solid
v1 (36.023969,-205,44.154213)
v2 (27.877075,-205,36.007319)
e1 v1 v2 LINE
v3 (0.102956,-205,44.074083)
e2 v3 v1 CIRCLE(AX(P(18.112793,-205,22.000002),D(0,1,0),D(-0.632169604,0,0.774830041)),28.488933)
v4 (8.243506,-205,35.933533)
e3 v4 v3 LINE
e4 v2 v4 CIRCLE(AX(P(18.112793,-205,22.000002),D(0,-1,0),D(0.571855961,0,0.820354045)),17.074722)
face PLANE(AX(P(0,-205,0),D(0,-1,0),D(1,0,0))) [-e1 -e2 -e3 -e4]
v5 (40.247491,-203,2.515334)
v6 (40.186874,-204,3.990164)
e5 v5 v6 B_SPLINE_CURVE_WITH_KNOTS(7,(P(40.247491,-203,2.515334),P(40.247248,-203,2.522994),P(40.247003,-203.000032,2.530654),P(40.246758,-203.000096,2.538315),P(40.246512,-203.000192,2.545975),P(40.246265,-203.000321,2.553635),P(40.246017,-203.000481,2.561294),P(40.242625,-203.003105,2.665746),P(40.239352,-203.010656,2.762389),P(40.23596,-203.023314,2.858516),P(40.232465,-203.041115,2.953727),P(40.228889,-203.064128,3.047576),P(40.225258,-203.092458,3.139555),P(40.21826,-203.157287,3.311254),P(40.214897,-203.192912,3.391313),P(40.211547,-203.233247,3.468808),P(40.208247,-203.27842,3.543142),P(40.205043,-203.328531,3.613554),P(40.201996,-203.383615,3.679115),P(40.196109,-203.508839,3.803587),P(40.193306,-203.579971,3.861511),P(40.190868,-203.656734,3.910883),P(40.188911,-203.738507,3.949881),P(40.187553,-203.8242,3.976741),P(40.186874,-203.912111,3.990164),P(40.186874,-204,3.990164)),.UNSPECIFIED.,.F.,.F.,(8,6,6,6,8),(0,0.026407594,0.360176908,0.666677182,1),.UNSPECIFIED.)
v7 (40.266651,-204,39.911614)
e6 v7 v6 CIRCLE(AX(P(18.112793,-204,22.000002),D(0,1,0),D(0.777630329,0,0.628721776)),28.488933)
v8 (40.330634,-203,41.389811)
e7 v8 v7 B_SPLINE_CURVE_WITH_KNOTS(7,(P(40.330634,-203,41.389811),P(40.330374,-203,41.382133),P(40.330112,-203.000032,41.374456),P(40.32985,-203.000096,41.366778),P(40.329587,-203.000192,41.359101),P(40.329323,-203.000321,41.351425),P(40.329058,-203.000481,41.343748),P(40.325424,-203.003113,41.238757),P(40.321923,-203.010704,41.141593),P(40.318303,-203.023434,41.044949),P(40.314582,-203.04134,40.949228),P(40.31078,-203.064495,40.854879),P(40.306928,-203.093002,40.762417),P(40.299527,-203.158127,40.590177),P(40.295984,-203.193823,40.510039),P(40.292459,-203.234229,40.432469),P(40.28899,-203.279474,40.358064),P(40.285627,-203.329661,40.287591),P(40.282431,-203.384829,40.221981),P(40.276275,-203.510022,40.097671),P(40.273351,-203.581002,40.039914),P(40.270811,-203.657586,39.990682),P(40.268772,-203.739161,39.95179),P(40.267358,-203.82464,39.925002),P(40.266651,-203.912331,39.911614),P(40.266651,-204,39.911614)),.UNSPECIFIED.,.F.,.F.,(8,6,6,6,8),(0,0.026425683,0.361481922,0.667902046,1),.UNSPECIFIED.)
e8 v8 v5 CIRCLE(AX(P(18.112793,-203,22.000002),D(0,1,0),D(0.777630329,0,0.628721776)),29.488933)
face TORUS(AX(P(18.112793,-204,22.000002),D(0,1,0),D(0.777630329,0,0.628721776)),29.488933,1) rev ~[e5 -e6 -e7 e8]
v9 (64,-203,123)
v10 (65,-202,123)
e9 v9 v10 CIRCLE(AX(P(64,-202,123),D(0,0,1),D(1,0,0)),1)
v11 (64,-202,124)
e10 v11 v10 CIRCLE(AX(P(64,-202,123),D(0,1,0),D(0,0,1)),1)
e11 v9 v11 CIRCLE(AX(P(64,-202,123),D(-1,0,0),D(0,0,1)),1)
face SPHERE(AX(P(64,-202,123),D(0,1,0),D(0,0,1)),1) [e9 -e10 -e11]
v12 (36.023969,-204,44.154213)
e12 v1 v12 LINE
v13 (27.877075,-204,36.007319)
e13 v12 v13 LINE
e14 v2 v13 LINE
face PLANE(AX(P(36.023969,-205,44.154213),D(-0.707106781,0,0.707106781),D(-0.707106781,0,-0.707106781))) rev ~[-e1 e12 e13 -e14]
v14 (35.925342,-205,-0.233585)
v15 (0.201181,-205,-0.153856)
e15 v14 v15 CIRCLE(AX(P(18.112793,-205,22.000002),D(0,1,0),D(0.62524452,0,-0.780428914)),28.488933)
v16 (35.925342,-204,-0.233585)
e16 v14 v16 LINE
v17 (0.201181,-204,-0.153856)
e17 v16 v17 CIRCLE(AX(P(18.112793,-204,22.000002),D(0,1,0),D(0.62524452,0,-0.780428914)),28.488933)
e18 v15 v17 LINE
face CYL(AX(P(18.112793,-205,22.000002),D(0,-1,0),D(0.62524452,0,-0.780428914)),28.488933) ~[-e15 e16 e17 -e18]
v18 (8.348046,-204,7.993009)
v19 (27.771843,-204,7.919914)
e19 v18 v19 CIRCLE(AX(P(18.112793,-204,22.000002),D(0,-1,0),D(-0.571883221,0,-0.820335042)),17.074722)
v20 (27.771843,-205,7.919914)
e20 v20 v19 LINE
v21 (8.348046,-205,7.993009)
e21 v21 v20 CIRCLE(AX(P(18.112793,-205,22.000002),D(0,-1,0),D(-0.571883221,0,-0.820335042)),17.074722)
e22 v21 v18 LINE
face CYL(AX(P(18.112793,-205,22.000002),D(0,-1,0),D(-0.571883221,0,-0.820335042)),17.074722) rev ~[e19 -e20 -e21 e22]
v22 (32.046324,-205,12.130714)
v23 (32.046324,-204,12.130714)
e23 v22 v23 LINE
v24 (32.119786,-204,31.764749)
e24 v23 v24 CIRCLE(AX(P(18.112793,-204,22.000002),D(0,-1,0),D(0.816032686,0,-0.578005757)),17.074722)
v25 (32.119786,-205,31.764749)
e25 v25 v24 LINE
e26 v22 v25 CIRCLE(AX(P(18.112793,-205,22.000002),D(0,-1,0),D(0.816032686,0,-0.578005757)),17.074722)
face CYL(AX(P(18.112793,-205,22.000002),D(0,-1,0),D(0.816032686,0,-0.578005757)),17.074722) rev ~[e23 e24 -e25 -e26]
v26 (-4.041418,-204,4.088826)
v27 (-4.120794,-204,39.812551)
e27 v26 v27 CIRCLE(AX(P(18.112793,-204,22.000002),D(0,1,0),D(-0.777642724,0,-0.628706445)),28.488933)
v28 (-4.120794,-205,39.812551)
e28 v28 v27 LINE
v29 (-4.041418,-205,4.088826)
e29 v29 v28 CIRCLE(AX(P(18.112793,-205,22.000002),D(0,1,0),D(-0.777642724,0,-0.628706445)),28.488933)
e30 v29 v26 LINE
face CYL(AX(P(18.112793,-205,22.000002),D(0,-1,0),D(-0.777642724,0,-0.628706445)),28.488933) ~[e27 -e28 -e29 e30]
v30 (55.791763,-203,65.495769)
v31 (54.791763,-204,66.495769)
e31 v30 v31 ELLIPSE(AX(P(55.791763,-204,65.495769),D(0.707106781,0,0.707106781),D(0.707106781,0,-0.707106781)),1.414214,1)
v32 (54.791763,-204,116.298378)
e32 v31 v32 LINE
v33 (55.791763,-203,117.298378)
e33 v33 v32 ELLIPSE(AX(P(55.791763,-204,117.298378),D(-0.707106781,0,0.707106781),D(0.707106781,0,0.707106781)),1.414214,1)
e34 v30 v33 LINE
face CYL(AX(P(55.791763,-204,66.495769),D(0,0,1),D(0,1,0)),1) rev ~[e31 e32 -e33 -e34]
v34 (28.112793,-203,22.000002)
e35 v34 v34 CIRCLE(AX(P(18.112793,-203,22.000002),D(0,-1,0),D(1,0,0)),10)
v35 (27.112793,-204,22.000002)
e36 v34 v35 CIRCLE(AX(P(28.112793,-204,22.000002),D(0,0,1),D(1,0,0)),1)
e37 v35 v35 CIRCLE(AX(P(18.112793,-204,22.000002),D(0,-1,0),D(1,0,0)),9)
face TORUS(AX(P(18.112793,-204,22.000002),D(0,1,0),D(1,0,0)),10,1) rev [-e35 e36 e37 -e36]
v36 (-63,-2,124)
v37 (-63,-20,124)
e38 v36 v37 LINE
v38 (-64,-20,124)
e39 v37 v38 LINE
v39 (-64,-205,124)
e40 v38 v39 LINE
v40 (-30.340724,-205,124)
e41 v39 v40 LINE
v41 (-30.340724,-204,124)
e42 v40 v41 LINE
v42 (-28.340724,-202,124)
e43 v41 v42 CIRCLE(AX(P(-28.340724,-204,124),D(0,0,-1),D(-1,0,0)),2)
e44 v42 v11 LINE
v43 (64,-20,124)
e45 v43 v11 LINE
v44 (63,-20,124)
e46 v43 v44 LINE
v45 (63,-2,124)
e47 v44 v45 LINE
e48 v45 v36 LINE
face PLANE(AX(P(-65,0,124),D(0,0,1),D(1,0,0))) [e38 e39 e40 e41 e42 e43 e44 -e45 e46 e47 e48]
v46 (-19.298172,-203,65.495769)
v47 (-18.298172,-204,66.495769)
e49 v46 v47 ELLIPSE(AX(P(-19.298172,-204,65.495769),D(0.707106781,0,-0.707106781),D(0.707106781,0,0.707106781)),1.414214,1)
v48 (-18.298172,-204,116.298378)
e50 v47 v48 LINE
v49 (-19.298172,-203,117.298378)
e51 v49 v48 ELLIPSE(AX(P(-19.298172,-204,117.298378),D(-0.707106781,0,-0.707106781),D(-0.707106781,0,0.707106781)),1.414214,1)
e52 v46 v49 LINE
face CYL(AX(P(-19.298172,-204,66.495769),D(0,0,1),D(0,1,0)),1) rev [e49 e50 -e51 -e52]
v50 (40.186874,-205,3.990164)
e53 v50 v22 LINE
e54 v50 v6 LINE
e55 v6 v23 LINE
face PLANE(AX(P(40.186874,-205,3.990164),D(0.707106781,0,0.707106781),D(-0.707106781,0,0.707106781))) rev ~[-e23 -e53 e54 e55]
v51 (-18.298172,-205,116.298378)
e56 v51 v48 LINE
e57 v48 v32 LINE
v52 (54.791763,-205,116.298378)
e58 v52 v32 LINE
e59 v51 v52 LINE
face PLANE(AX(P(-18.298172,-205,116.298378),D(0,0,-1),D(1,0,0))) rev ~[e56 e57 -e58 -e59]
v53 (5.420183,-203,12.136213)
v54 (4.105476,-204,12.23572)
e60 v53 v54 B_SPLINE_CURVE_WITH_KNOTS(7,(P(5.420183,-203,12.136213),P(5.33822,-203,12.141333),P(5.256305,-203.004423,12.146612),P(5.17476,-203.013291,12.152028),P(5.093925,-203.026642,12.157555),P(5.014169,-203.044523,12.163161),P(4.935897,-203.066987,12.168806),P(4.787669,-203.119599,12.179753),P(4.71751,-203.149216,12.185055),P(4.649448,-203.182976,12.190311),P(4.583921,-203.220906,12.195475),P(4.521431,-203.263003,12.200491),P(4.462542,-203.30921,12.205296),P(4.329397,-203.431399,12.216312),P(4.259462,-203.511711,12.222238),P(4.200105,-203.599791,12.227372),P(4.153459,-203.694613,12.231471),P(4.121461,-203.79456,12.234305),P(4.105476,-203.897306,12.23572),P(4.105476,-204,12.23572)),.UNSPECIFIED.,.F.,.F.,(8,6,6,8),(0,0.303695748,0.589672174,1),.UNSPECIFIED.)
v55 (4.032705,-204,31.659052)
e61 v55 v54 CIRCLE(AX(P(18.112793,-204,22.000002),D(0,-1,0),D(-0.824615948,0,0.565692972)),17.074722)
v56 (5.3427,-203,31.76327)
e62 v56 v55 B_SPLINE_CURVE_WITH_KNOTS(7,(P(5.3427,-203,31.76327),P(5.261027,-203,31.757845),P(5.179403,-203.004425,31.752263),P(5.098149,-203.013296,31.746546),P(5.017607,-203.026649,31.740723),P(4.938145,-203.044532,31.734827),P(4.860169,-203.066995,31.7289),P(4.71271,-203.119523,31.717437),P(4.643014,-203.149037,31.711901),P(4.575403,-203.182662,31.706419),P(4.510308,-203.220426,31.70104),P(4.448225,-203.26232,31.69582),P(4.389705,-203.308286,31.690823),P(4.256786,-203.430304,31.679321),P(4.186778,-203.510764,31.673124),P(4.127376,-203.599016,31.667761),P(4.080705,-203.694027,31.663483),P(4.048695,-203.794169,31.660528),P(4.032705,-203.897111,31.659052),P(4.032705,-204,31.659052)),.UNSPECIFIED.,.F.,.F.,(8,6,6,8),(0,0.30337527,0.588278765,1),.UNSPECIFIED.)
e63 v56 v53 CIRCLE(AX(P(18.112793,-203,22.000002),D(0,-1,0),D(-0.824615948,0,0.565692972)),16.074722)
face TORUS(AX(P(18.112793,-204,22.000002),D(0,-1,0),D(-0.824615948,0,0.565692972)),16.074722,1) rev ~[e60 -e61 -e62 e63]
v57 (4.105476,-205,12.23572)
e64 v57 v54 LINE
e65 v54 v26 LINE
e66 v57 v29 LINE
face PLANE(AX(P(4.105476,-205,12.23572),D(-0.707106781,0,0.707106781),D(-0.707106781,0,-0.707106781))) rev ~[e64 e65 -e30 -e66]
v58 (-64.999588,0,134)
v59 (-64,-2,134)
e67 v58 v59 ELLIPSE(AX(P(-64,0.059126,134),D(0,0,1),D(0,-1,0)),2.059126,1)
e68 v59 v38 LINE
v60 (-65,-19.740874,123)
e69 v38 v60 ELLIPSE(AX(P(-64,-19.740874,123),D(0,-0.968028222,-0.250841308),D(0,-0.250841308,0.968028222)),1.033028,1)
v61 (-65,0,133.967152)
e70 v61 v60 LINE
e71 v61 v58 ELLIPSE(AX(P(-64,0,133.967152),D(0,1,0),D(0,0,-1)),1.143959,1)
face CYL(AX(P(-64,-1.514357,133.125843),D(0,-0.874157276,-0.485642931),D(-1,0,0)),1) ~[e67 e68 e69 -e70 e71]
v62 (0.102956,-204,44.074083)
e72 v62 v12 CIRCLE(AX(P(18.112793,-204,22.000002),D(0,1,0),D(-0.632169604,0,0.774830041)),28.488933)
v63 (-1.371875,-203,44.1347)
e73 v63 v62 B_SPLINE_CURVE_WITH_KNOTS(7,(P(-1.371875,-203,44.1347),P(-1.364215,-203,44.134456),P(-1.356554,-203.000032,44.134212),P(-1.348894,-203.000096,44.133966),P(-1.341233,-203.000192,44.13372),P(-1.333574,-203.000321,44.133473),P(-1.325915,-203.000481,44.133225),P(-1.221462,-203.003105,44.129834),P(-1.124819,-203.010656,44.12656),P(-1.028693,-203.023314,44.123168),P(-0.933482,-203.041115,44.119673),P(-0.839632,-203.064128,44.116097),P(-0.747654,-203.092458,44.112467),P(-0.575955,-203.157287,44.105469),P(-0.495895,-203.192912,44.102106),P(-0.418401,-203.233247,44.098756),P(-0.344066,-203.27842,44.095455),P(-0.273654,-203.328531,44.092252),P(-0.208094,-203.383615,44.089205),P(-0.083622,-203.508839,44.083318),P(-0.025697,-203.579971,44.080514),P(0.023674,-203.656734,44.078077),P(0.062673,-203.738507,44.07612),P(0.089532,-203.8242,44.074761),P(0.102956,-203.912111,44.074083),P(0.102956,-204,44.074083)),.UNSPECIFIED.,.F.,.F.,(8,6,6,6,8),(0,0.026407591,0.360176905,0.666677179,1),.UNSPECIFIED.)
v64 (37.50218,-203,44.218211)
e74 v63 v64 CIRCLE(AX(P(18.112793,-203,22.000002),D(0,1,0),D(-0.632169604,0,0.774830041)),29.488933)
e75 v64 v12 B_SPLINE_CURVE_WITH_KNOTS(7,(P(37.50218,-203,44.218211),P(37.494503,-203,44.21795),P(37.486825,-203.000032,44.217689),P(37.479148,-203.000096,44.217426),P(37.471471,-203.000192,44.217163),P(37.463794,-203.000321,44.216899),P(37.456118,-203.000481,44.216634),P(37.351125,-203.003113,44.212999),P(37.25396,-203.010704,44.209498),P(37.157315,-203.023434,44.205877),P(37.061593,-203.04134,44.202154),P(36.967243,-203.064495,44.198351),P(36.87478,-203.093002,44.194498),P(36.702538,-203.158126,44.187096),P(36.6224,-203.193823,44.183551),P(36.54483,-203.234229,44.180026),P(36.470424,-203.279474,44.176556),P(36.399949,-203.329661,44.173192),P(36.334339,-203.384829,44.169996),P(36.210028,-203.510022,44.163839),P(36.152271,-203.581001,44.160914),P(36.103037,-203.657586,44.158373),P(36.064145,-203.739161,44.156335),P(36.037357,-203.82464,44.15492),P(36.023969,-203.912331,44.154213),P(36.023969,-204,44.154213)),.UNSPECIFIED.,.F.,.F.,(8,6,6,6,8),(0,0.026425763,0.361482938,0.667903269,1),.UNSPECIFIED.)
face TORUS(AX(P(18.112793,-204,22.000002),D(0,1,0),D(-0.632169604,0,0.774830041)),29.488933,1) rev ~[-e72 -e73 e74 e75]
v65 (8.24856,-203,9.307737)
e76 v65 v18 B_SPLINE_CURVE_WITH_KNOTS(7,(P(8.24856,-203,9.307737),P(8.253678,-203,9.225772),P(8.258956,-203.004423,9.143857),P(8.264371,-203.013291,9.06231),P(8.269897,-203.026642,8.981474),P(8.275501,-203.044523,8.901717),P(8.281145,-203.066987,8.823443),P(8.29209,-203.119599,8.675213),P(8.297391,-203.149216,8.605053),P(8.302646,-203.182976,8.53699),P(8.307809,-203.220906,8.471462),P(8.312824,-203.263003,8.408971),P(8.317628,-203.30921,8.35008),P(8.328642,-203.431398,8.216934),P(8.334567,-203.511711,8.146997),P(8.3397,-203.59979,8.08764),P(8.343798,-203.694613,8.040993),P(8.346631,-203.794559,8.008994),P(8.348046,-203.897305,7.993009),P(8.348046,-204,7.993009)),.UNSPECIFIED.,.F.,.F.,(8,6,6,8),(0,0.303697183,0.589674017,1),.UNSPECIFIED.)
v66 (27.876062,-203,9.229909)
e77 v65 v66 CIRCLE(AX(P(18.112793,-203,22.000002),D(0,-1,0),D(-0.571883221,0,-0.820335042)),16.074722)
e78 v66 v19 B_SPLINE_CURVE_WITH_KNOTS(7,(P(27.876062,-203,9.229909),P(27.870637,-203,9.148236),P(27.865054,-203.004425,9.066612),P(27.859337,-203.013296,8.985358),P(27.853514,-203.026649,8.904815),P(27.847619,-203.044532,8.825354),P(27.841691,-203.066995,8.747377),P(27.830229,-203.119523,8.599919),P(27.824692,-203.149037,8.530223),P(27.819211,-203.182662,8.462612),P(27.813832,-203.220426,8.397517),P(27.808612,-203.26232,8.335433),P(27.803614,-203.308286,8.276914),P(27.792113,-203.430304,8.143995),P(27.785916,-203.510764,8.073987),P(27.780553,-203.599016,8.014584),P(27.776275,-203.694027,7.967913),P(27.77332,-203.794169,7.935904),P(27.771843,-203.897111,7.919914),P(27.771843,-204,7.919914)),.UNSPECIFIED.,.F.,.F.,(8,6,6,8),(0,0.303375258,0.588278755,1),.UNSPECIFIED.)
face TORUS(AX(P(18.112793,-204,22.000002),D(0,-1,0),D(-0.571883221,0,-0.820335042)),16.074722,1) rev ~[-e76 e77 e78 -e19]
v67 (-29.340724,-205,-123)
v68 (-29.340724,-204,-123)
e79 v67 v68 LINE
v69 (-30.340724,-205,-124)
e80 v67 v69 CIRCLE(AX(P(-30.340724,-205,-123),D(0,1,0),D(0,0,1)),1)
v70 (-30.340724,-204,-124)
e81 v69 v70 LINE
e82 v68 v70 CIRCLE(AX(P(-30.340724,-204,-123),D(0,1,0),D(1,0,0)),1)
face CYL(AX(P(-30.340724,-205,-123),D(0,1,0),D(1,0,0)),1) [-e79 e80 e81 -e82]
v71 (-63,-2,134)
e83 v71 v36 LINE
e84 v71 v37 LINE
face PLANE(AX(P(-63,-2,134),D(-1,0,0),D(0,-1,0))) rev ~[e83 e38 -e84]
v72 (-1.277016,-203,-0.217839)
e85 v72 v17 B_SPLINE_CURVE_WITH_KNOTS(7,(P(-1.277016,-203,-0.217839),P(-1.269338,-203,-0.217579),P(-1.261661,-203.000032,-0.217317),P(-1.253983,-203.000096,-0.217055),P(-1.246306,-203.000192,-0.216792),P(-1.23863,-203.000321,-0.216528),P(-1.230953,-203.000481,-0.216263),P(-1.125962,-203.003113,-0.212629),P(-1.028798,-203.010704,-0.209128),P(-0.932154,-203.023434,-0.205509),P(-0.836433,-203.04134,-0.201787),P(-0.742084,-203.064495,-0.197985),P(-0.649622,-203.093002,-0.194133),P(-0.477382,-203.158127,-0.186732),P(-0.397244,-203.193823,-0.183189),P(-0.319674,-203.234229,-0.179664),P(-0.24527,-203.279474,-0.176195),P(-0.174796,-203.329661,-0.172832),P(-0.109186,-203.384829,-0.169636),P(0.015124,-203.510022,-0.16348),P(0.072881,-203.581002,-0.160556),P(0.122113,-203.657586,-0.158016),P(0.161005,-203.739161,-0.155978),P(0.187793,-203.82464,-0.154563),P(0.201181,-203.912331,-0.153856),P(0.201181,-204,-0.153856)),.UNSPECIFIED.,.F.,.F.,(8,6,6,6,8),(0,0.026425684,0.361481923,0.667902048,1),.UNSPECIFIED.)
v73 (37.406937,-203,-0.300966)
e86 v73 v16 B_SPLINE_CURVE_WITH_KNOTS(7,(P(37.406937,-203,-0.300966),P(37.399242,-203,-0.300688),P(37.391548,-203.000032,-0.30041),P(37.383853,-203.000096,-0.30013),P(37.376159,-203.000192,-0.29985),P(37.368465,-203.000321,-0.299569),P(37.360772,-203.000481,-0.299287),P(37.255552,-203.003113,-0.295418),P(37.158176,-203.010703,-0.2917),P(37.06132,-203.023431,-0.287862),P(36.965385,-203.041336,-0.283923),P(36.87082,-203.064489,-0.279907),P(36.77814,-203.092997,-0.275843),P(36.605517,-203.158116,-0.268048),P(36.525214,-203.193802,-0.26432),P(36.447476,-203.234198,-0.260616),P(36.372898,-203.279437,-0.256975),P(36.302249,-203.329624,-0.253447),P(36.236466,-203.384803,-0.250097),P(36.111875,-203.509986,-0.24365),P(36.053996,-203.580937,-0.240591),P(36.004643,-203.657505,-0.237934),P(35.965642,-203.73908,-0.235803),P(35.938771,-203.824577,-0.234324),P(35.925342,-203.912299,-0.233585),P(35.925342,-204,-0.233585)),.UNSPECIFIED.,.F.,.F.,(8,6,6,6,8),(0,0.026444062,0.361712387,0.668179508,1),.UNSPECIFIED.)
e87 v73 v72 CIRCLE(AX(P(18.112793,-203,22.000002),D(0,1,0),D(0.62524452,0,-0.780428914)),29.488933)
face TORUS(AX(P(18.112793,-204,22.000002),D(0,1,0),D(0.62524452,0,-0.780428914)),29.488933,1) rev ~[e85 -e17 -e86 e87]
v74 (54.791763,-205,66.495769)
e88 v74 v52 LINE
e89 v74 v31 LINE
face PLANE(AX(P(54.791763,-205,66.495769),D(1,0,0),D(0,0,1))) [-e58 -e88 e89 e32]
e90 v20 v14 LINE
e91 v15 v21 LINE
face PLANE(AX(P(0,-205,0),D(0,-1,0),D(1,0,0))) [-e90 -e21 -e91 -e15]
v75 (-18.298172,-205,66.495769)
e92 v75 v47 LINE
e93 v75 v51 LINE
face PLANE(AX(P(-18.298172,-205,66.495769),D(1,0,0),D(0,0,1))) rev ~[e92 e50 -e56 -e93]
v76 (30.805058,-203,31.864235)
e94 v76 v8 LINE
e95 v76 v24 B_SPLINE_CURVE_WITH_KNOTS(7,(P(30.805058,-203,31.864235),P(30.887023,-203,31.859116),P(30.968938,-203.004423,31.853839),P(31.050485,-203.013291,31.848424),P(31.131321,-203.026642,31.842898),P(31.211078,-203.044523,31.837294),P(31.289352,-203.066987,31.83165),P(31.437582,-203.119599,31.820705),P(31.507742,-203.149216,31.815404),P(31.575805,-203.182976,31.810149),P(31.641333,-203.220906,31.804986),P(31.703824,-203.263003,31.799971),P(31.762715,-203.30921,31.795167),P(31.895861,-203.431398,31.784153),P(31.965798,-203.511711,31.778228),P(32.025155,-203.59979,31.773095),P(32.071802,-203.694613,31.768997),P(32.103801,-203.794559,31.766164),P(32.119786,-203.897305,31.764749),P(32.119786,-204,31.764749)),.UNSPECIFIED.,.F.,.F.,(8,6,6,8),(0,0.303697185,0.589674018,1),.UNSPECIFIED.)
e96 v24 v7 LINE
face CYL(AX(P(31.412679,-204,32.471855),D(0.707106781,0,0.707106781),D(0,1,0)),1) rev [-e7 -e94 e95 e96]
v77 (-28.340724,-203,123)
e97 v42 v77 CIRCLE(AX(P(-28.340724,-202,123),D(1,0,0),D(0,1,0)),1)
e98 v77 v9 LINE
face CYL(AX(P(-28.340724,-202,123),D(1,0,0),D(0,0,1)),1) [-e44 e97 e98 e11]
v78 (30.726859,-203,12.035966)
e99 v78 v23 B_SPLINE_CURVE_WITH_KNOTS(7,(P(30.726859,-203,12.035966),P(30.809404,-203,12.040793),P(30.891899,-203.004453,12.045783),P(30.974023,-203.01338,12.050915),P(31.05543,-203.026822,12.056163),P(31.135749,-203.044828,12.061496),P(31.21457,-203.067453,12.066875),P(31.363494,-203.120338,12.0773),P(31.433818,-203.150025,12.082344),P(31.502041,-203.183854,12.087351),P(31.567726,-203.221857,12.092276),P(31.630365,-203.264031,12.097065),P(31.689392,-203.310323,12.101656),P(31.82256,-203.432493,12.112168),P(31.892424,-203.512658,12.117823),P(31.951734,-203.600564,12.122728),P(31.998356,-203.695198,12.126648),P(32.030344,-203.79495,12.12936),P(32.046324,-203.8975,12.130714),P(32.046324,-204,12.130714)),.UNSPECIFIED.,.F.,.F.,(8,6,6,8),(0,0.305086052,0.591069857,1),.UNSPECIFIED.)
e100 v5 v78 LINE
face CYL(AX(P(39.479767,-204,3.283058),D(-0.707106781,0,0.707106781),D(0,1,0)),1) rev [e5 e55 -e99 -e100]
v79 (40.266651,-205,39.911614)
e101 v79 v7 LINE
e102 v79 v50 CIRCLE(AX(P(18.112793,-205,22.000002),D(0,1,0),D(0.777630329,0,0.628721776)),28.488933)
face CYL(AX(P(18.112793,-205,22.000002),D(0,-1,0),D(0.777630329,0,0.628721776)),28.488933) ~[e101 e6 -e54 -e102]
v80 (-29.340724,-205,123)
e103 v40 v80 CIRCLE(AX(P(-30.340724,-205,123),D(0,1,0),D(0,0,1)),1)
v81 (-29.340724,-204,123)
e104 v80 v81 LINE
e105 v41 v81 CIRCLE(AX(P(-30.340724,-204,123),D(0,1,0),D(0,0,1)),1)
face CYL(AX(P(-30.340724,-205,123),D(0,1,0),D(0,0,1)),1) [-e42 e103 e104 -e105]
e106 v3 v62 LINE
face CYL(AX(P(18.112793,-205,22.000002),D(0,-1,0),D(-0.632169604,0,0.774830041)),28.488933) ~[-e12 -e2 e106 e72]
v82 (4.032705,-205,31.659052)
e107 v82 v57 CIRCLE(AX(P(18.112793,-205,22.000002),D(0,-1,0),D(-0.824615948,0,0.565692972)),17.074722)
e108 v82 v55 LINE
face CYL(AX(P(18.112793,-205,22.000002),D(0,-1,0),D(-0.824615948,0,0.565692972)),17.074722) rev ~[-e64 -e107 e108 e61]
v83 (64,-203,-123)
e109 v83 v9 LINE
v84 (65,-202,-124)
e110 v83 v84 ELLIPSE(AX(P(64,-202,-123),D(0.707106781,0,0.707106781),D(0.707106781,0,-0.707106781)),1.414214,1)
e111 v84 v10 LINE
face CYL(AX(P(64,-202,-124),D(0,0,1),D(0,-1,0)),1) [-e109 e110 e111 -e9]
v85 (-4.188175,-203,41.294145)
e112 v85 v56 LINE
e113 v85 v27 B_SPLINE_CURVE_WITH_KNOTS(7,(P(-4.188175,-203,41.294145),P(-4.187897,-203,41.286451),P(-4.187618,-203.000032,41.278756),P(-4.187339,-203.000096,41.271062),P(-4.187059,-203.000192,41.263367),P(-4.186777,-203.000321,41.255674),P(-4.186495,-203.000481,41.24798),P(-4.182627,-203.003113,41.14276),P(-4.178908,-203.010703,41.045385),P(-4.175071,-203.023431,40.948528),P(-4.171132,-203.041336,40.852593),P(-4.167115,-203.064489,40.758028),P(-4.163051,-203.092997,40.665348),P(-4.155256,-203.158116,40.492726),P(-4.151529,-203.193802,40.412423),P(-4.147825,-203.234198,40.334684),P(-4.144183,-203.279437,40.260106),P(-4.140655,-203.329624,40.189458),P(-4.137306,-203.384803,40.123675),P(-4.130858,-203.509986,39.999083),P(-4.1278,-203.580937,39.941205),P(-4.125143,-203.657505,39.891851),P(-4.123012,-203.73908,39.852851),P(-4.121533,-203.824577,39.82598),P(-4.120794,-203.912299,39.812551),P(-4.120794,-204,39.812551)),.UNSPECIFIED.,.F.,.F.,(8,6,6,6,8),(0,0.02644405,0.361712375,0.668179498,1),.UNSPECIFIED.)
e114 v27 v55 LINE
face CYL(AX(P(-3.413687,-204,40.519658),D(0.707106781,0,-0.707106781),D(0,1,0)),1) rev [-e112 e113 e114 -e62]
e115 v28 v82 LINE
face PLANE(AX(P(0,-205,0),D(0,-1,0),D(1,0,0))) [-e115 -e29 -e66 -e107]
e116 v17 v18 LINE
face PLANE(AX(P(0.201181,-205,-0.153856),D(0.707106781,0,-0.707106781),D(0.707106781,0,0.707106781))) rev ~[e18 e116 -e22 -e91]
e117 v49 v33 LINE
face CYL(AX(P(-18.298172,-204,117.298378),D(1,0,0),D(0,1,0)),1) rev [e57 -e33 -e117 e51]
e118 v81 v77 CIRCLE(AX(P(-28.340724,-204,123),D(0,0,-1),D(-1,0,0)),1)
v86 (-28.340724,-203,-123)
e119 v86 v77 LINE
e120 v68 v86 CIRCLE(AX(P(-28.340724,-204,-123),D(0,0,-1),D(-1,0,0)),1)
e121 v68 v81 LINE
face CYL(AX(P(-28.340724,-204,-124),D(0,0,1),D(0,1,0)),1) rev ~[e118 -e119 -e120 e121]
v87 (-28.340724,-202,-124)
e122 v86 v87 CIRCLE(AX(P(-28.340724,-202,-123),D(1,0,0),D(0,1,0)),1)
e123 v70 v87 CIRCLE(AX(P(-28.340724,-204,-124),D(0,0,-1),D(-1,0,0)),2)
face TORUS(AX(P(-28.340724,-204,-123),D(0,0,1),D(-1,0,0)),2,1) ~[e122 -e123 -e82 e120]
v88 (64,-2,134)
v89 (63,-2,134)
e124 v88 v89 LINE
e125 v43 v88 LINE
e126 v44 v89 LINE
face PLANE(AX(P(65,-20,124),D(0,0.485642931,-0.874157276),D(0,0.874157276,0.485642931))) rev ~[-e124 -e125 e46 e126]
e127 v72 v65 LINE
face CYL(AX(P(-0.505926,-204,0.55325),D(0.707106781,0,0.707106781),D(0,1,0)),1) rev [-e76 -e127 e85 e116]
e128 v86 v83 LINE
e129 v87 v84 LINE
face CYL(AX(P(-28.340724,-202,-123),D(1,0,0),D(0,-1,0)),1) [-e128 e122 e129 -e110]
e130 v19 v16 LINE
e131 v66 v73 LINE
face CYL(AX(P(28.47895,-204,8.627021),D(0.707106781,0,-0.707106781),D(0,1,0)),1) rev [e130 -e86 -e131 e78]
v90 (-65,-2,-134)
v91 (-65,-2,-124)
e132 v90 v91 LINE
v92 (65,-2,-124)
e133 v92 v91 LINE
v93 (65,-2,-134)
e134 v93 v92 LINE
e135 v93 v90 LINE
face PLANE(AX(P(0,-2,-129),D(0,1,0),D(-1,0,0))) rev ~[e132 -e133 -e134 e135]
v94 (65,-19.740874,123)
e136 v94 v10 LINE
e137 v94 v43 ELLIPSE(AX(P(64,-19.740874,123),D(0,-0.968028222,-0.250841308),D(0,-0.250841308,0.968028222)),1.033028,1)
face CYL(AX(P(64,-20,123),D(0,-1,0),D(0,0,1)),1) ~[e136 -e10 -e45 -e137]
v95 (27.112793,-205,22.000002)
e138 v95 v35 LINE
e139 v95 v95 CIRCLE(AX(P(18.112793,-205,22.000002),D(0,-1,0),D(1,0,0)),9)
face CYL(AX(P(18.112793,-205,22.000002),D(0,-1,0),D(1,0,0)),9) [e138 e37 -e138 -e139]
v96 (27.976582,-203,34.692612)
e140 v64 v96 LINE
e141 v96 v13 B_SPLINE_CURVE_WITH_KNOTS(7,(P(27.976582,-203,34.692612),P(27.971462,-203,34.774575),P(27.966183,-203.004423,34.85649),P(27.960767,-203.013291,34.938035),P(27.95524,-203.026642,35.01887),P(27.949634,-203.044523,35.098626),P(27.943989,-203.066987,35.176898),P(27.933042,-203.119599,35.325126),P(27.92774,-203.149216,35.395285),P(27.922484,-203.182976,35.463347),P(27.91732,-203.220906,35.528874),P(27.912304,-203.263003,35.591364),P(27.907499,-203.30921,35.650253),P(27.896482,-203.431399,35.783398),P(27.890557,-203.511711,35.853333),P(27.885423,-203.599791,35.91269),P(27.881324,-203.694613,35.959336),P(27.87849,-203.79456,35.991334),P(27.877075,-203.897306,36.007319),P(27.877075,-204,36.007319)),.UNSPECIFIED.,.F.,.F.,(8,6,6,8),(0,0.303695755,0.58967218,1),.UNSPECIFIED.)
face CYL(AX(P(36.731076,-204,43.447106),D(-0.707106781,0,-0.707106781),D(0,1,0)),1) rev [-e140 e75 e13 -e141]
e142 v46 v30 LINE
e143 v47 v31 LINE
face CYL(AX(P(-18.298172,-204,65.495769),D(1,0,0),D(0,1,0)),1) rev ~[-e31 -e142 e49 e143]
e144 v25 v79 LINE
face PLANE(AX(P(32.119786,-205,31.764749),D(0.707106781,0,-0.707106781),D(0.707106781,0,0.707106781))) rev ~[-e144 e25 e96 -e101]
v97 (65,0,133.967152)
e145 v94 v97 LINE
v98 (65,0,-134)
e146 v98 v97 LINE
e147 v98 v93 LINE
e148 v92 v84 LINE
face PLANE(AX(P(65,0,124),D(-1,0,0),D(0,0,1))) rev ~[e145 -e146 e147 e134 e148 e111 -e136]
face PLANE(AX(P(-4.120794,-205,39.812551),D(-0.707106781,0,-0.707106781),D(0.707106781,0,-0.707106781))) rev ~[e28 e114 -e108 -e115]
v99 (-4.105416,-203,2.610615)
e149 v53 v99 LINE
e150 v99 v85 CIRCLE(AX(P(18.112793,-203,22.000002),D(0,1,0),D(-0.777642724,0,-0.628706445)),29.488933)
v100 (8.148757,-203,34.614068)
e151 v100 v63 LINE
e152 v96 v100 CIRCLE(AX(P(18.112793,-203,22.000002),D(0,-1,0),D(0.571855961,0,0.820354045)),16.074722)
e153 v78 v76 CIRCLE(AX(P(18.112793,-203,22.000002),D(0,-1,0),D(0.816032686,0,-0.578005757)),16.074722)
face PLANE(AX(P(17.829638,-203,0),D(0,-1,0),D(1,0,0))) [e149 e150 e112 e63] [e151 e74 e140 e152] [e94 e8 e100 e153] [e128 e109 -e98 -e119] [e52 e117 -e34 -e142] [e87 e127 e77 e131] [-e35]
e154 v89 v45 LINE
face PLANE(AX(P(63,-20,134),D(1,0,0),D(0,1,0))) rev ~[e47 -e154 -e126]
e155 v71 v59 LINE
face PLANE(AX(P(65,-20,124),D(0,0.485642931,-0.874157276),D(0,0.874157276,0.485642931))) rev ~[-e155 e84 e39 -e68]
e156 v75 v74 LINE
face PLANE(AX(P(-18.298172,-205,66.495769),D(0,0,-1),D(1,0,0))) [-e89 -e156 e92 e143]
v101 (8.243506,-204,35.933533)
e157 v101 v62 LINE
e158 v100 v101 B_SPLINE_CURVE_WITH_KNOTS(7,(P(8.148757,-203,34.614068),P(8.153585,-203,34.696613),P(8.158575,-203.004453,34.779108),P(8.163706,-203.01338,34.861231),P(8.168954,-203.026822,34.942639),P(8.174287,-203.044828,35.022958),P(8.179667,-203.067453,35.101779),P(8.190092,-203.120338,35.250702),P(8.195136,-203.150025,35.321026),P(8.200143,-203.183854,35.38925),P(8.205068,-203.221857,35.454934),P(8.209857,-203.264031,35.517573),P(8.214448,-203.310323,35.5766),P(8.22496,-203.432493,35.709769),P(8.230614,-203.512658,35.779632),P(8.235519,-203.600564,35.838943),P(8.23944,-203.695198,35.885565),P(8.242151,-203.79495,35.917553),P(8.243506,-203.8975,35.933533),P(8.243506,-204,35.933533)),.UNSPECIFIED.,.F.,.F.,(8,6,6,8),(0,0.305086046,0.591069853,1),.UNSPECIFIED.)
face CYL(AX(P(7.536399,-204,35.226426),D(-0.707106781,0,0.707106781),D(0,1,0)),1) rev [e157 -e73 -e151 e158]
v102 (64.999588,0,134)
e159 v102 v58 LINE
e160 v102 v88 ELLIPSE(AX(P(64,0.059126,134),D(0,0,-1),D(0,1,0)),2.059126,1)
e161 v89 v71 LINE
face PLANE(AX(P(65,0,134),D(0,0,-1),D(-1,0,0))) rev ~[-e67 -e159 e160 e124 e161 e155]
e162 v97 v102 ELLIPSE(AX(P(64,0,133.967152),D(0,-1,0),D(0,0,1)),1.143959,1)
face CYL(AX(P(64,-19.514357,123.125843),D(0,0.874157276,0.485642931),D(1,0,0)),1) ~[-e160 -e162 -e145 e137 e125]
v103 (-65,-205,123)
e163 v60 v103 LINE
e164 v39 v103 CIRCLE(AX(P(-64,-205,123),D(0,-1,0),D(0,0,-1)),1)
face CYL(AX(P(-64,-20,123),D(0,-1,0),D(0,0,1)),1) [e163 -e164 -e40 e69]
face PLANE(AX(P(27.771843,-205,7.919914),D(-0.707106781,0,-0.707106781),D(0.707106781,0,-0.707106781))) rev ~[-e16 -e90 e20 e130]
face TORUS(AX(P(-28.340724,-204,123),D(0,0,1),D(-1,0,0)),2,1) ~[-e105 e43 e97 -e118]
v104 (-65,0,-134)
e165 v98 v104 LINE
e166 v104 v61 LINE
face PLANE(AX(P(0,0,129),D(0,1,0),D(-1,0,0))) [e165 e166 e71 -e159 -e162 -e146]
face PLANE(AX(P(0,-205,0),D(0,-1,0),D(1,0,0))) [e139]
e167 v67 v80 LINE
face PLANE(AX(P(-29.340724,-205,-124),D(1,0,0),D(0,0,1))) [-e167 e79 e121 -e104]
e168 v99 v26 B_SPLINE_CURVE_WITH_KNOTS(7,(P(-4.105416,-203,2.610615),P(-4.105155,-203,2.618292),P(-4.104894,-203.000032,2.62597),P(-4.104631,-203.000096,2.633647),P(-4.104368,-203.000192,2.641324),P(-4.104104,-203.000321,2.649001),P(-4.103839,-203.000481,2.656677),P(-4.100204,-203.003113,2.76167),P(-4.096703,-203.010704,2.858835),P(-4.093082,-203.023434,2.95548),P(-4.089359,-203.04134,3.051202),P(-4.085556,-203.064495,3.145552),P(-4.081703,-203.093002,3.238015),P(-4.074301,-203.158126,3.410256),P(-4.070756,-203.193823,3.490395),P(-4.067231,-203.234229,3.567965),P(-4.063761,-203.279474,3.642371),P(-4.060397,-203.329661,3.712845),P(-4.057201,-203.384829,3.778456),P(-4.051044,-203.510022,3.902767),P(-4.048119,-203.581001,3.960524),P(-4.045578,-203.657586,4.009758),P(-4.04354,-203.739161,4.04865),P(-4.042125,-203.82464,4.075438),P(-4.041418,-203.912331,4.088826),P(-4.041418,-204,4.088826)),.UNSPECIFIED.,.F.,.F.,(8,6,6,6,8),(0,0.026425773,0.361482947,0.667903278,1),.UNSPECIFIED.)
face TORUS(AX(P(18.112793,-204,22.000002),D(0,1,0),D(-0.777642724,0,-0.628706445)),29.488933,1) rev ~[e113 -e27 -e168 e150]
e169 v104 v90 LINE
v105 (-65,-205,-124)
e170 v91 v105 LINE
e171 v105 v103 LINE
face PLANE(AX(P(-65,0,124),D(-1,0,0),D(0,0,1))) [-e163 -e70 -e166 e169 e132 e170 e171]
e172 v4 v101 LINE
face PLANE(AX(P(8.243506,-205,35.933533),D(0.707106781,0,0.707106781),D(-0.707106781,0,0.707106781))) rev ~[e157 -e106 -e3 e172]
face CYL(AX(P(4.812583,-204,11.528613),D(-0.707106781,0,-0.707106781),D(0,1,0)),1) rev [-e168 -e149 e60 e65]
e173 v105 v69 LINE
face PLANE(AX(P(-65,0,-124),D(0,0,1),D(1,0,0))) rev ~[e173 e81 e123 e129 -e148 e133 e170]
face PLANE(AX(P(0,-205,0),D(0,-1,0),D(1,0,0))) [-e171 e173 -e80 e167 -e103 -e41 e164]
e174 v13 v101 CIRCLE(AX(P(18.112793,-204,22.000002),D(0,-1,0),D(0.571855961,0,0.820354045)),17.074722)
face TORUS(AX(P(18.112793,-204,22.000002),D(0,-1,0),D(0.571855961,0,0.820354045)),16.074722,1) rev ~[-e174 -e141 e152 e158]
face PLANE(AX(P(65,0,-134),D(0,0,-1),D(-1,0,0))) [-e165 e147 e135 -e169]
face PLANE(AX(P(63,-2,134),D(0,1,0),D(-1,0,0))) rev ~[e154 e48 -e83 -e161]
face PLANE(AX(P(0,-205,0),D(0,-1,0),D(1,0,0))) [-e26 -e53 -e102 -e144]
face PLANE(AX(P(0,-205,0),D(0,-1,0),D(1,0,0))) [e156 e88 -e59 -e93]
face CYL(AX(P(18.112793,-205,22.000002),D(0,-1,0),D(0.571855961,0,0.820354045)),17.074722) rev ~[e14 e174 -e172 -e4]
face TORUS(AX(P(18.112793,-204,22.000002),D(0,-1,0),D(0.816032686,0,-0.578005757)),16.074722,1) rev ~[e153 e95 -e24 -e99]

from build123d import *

# Parameters (mm, degrees)
F0_W      = 130
F0_H      = 248
F1_DEPTH  = 205
F2_W      = 94.3407235295
F2_H      = 248
F2_R      = 9
F2_W_2    = 73.0899348855
F2_H_2    = 49.802608788
F3_DEPTH  = 2
F4_W      = 130
F4_H      = 10
F5_DEPTH  = 20
F7_DEPTH  = 10
F9_DEPTH  = 130.001
F10_F1_R  = 1
F10_F2_R  = 1
F11_DEPTH = 18


with BuildPart() as f1:
    # F0 (on Front) → F1 (new body)
    with BuildSketch(Plane.XZ):
        Rectangle(F0_W, F0_H)
    extrude(amount=F1_DEPTH)

    # F2 (on face) → F3 (cut)
    with BuildSketch(Plane.XZ.offset(205)):
        with Locations((17.8296382353, 0)):
            Rectangle(F2_W, F2_H)
        with BuildLine():
            ThreePointArc((-4.041418053, 4.0888261301), (-10.3760691988, 21.9367014989), (-4.1207936375, 39.8125507927))
            Line((-4.1207936375, 39.8125507927), (4.0327052851, 31.6590518702))
            ThreePointArc((4.0327052851, 31.6590518702), (1.0381912146, 21.9360306033), (4.1054760852, 12.2357202683))
            Line((4.1054760852, 12.2357202683), (-4.041418053, 4.0888261301))
        make_face(mode=Mode.SUBTRACT)
        with BuildLine():
            Line((27.7718433373, 7.9199138179), (35.9253422598, -0.2335851046))
            ThreePointArc((35.9253422598, -0.2335851046), (18.0492121242, -6.4888600406), (0.2011808104, -0.1538563808))
            Line((0.2011808104, -0.1538563808), (8.3480462814, 7.9930090903))
            ThreePointArc((8.3480462814, 7.9930090903), (18.0485383783, 4.9254008127), (27.7718433373, 7.9199138179))
        make_face(mode=Mode.SUBTRACT)
        with Locations((18.1127931993, 22.0000017322)):
            Circle(F2_R, mode=Mode.SUBTRACT)
        with BuildLine():
            ThreePointArc((0.1029558919, 44.0740826376), (18.0492420298, 50.4888635717), (36.0239688015, 44.1542129845))
            Line((36.0239688015, 44.1542129845), (27.8770746633, 36.0073188463))
            ThreePointArc((27.8770746633, 36.0073188463), (18.0486241947, 39.0746029744), (8.2435056862, 35.9335328433))
            Line((8.2435056862, 35.9335328433), (0.1029558919, 44.0740826376))
        make_face(mode=Mode.SUBTRACT)
        with BuildLine():
            ThreePointArc((40.2666513123, 39.9116141211), (46.6016556639, 21.9367314045), (40.1868741048, 3.9901644247))
            Line((40.1868741048, 3.9901644247), (32.0463243105, 12.130714219))
            ThreePointArc((32.0463243105, 12.130714219), (35.1873955054, 21.9361164198), (32.1197858413, 31.7647486501))
            Line((32.1197858413, 31.7647486501), (40.2666513123, 39.9116141211))
        make_face(mode=Mode.SUBTRACT)
        with Locations((18.2467956167, 91.3970731086)):
            Rectangle(F2_W_2, F2_H_2, mode=Mode.SUBTRACT)
    extrude(amount=-F3_DEPTH, mode=Mode.SUBTRACT)

    # F4 (on face) → F5 (join)
    with BuildSketch(Plane(origin=(0, 0, 0), x_dir=(-1, 0, 0), z_dir=(0, 1, 0))):
        with Locations((0, 129)):
            Rectangle(F4_W, F4_H)
        with Locations((0, -129)):
            Rectangle(F4_W, F4_H)
    extrude(amount=-F5_DEPTH)

    # F6 (on face) → F7 (cut, through all)
    with BuildSketch(Plane.XY.offset(134)):
        Polygon((63, -2), (-63, -2), (-63, -20), (63, -20), (63, -18), align=None)
    extrude(amount=-F7_DEPTH, mode=Mode.SUBTRACT)

    # F8 (on face) → F9 (cut, through all)
    with BuildSketch(Plane.YZ.offset(65)):
        Polygon((-20, 134), (-20, 124), (-2, 134), align=None)
    extrude(amount=-F9_DEPTH, mode=Mode.SUBTRACT)

    # F10: fillet of radius 1 on 29 edges, made by hand

    # F10_f1
    f10_f1_edges = [f1.edges().sort_by_distance(p)[0] for p in [
        (-29.3407235295, -203, 0),
        (-0.0440441762, -203, 35.7358013315),
        (1.0381912146, -203, 21.9360306033),
        (0.0320290161, -203, 8.1622731992),
        (-10.3760691988, -203, 21.9367014989),
        (4.2746135459, -203, 3.9195763547),
        (18.0485383783, -203, 4.9254008127),
        (31.8485927986, -203, 3.8431643567),
        (18.0492121242, -203, -6.4888600406),
        (9.1127931993, -203, 22.0000017322),
        (18.0492420298, -203, 50.4888635717),
        (31.9505217324, -203, 40.0807659154),
        (18.0486241947, -203, 39.0746029744),
        (4.173230789, -203, 40.0038077405),
        (36.1932185768, -203, 35.8381813856),
        (46.6016556639, -203, 21.9367314045),
        (36.1165992076, -203, 8.0604393219),
        (35.1873955054, -203, 21.9361164198),
        (18.2467956167, -203, 66.4957687146),
        (-18.2981718261, -203, 91.3970731086),
        (18.2467956167, -203, 116.2983775027),
        (54.7917630594, -203, 91.3970731086),
    ]]
    fillet(f10_f1_edges, radius=F10_F1_R)

    # F10_f2
    f10_f2_edges = [f1.edges().sort_by_distance(p)[0] for p in [
        (-65, -112.5, 124),
        (-65, -11, 129),
        (65, -11, 129),
        (65, -111.5, 124),
        (18.3296382353, -203, 124),
        (18.3296382353, -203, -124),
        (65, -203, 0),
        (-29.0478303106, -203.2928932188, -124),
        (-29.0478303106, -203.2928932188, 124),
    ]]
    fillet(f10_f2_edges, radius=F10_F2_R)

    # F11 (cut): a face of the model
    f11_faces = [f1.faces().sort_by_distance(p)[0] for p in [
        (0, -20, -129),
    ]]
    extrude(f11_faces, amount=-F11_DEPTH, mode=Mode.SUBTRACT)


solid = f1.part
